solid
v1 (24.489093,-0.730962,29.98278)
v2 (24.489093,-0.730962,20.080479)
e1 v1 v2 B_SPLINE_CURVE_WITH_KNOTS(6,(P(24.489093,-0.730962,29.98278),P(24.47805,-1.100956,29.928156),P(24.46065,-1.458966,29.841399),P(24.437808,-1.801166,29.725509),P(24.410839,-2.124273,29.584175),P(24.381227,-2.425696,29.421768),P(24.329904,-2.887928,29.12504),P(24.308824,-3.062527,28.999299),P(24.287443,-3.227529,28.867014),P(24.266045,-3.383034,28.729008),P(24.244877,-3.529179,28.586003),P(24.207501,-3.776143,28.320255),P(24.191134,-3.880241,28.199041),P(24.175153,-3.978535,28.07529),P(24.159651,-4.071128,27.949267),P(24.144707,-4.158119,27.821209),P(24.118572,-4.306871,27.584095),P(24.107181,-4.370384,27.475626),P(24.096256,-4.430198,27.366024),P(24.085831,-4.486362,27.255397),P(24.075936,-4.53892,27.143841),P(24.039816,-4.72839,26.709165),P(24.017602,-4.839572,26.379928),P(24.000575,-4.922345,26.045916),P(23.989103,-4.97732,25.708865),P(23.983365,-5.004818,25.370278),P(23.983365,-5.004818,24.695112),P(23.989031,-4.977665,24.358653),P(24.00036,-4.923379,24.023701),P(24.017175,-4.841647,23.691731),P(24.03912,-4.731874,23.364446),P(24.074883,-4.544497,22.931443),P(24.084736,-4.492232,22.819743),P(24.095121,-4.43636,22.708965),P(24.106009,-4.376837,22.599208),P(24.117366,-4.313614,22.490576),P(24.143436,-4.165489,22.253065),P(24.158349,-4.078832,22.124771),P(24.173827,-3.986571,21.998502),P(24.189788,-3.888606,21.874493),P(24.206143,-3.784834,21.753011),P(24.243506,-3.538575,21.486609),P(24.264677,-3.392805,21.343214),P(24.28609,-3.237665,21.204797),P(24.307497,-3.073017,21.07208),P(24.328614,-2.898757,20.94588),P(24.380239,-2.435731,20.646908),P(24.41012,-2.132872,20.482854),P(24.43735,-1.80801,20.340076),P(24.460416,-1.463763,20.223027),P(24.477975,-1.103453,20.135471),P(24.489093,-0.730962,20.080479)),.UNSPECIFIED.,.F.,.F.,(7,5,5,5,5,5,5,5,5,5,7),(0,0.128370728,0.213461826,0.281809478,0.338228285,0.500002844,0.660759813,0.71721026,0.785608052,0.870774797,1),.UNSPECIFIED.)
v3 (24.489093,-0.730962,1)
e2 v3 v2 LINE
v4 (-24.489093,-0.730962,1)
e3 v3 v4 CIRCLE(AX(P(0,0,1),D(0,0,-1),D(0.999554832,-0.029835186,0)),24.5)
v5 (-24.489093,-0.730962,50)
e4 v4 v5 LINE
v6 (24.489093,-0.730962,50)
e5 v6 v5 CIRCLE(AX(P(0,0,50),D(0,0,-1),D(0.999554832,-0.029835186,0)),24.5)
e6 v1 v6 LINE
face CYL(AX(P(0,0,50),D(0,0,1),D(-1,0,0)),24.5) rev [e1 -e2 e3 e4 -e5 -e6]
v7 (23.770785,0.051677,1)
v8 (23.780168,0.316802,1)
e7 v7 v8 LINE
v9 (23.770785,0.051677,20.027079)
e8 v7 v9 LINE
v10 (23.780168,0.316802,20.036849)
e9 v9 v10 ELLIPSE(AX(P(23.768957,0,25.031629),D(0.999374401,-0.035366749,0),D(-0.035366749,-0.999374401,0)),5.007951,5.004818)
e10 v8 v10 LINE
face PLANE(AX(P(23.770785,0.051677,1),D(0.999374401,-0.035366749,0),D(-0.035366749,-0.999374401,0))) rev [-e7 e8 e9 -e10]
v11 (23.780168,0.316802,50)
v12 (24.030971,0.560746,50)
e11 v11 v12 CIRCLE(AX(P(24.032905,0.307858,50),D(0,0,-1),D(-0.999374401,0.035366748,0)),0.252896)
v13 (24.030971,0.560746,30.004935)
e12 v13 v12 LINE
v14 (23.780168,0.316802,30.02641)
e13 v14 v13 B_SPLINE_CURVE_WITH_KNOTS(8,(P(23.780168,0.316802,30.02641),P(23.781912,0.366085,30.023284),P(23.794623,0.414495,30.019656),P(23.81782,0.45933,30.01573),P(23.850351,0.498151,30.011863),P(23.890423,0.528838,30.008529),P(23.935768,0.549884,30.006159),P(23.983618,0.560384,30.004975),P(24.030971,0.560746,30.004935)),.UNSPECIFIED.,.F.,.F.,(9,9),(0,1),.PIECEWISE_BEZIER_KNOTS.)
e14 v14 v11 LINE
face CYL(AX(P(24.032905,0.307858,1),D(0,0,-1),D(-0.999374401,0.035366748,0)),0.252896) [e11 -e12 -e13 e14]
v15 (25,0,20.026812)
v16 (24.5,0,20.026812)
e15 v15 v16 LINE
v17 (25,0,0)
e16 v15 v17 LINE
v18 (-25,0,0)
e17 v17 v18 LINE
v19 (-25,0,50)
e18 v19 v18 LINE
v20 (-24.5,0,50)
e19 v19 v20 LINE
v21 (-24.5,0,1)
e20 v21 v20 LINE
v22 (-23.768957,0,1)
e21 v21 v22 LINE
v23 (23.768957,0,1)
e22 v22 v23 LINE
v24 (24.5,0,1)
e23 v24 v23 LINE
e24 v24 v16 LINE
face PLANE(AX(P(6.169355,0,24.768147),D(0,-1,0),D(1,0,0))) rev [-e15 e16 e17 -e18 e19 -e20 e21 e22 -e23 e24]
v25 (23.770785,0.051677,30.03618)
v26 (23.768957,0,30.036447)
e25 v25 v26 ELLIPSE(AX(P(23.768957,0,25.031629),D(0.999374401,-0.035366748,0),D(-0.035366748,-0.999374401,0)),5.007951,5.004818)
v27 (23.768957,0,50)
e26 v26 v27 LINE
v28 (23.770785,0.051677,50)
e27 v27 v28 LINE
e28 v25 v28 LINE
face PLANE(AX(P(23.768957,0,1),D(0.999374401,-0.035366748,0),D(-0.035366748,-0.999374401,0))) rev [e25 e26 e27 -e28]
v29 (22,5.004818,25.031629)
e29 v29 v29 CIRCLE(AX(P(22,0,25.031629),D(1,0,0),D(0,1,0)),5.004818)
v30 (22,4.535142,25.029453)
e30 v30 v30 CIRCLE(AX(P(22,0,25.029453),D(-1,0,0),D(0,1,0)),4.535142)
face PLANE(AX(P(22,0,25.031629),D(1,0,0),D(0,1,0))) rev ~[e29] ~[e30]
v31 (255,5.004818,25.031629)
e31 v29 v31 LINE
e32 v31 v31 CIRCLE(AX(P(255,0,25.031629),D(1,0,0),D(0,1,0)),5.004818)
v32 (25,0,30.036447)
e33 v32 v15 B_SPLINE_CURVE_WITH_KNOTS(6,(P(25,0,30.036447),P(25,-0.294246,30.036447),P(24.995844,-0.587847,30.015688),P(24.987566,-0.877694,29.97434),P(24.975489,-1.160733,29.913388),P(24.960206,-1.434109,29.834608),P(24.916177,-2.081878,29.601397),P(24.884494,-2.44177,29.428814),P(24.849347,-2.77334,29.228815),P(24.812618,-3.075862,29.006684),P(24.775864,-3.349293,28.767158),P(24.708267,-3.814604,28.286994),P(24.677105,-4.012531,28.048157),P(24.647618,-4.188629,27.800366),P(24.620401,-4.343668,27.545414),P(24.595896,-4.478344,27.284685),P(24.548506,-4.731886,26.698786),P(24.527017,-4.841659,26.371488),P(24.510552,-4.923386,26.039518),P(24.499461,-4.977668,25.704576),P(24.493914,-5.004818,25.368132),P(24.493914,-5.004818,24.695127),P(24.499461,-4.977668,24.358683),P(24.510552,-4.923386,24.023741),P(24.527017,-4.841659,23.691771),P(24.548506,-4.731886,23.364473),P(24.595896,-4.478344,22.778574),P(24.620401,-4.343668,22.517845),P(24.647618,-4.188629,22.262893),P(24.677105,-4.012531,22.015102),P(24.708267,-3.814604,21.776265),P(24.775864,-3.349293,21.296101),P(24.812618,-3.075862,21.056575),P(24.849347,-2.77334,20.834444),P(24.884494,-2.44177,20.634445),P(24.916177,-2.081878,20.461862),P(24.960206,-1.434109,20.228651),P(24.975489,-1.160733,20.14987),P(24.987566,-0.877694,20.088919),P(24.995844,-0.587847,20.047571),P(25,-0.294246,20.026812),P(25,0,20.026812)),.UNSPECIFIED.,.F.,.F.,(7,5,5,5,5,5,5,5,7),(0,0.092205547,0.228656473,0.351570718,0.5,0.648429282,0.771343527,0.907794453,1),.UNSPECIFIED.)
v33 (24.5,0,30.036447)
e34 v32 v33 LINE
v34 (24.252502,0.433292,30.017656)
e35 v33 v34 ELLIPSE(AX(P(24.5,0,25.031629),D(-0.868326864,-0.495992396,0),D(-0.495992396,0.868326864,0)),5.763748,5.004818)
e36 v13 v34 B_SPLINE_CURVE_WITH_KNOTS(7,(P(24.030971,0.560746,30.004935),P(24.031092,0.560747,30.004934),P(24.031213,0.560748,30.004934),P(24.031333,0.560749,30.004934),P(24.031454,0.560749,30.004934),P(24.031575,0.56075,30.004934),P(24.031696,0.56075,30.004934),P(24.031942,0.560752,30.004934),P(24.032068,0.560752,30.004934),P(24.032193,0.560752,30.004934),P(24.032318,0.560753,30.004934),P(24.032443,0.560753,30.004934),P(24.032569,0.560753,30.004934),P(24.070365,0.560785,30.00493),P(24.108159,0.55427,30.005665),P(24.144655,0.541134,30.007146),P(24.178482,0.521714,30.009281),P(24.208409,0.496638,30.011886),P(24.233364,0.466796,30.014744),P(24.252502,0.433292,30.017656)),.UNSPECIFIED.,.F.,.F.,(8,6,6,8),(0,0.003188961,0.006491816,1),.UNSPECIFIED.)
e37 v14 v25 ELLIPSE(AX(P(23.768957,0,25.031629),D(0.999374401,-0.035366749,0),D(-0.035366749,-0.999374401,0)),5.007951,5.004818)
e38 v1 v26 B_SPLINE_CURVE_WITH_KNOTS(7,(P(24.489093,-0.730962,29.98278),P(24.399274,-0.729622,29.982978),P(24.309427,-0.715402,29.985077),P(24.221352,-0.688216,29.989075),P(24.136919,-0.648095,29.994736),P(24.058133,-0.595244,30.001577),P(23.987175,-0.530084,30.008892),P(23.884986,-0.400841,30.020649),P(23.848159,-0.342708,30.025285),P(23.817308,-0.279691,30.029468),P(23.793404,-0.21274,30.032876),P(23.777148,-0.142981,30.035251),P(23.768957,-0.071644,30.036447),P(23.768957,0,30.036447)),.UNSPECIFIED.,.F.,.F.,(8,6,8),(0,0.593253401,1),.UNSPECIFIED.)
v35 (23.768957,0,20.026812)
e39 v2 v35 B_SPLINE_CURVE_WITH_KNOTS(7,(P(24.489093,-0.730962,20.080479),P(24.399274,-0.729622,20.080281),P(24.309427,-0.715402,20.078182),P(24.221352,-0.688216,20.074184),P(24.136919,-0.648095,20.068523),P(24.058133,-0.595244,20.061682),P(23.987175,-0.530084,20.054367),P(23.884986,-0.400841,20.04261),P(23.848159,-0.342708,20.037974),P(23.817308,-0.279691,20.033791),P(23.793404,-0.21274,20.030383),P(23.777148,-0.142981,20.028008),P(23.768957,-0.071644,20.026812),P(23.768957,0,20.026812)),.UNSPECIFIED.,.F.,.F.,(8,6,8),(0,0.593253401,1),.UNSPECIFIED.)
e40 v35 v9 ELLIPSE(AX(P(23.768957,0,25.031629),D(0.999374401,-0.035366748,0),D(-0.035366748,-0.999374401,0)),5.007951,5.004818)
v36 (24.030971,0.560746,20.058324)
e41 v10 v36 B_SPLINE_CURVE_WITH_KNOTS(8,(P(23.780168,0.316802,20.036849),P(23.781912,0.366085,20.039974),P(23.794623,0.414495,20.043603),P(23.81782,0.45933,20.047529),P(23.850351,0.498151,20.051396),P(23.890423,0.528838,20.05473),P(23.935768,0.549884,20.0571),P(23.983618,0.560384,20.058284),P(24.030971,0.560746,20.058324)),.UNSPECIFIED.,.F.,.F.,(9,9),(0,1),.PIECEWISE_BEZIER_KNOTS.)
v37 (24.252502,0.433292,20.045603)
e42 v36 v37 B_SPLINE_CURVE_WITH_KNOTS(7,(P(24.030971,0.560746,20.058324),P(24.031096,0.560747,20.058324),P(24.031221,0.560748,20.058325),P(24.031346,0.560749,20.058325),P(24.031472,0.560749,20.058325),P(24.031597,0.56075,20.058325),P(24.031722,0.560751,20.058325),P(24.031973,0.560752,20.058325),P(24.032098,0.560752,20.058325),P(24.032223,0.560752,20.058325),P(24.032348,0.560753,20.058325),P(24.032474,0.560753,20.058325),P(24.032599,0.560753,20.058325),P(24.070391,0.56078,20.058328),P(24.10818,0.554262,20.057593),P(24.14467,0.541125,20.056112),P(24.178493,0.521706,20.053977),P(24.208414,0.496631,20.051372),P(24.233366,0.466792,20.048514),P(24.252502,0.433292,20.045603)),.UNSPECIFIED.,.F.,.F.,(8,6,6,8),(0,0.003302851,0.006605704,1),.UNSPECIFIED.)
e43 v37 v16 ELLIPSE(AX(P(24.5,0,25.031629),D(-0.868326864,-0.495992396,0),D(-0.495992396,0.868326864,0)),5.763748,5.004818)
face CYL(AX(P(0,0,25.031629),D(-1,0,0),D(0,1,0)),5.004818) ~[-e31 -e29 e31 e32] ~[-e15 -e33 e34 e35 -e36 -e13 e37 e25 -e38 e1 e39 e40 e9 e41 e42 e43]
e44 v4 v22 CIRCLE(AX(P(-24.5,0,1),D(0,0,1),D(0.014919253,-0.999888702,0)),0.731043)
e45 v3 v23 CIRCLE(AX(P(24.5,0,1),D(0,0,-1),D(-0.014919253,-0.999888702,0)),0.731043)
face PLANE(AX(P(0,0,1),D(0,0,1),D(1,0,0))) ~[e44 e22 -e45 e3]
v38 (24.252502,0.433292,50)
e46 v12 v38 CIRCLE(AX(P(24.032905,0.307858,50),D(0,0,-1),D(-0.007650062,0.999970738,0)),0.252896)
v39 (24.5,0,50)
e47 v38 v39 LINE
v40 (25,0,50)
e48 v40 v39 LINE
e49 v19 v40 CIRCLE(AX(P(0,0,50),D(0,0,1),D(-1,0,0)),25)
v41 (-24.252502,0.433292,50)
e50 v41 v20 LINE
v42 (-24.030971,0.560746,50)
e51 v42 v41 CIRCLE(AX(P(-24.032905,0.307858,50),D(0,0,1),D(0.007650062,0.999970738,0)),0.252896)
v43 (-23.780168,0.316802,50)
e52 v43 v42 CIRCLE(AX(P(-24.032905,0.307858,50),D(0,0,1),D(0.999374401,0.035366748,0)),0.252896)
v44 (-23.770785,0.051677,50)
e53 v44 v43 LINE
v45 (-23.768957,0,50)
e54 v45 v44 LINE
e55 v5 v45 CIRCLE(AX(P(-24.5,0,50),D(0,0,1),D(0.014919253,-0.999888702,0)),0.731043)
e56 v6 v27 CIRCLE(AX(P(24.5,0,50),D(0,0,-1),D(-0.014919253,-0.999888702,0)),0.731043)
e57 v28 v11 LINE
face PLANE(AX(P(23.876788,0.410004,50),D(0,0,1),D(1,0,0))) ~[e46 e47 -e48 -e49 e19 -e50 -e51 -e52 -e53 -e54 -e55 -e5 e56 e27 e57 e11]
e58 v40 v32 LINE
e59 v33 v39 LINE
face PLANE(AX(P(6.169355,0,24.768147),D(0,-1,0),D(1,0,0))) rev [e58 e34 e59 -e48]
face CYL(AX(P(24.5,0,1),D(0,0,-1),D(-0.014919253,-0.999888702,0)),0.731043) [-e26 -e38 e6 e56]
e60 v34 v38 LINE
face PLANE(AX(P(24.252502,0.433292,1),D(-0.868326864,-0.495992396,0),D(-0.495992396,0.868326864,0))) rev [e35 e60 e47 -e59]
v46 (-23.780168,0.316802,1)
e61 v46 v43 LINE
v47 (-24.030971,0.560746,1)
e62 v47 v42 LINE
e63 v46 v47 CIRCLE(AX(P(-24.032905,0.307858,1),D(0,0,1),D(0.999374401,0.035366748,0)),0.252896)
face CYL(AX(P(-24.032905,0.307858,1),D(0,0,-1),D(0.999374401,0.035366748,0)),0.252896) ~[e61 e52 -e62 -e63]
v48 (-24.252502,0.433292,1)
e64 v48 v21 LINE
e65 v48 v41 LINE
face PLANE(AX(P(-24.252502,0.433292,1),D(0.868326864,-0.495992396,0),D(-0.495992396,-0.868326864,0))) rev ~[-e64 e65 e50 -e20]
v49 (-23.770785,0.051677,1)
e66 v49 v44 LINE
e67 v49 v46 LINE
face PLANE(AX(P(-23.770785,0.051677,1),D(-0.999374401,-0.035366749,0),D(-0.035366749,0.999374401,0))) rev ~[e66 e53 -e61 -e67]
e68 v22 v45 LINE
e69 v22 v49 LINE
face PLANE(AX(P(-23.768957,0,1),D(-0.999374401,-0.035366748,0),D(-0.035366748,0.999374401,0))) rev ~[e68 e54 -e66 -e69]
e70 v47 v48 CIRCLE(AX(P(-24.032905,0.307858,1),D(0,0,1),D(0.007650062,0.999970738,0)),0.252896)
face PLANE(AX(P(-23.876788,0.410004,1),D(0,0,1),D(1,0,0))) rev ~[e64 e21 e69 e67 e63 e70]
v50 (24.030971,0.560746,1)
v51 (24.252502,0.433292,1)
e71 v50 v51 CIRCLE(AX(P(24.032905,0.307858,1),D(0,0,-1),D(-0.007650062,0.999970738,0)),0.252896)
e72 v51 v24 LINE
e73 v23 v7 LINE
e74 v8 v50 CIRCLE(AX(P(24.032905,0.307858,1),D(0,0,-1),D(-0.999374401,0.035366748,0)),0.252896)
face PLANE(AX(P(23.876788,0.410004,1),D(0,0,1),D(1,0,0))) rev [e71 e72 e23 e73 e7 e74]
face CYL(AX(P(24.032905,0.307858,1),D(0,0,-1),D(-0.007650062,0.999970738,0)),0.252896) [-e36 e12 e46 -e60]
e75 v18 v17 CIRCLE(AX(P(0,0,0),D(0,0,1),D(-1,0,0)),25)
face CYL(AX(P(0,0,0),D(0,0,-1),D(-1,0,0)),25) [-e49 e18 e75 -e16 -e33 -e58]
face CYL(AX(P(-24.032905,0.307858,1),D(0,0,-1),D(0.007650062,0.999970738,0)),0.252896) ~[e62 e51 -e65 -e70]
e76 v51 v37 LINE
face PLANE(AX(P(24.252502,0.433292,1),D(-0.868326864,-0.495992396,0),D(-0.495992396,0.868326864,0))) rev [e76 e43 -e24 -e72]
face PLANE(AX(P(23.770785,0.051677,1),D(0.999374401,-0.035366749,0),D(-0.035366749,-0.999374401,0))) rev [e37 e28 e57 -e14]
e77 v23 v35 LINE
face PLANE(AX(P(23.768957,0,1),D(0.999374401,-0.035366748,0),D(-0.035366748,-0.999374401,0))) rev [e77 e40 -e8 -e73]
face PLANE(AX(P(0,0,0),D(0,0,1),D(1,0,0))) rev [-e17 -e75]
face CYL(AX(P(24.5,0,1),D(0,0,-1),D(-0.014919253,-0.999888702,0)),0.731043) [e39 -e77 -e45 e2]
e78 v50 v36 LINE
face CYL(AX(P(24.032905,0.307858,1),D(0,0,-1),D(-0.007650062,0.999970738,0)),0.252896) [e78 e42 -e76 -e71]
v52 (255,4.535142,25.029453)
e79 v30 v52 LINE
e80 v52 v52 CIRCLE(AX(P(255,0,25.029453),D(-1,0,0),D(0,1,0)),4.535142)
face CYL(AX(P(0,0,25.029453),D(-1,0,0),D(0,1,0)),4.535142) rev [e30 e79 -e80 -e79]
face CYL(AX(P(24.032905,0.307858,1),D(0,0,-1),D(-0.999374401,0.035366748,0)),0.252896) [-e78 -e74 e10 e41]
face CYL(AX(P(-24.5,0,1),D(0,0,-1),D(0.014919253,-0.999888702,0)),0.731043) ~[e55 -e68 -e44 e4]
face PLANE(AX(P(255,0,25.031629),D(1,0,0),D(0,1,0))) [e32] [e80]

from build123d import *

# Parameters (mm, degrees)
F0_R      = 25
F1_DEPTH  = 50
F2_R      = 24.5
F3_DEPTH  = 49
F4_W      = 133.0040432513
F4_H      = 80.2016193047
F5_DEPTH  = 25
F7_DEPTH  = 49
F8_W      = 90.9072607756
F8_H      = 76.9354877993
F9_DEPTH  = 25
F11_R     = 5.0048176475
F11_R_2   = 4.4964097491
F12_DEPTH = 255
F13_DEPTH = 22
F14_R     = 4.5351415883
F15_DEPTH = 500


with BuildPart() as f1:
    # F0 (on Top) → F1 (new body)
    with BuildSketch(Plane.XY):
        Circle(F0_R)
    extrude(amount=F1_DEPTH)

    # F2 (on face) → F3 (cut)
    with BuildSketch(Plane.XY.offset(50)):
        Circle(F2_R)
    extrude(amount=-F3_DEPTH, mode=Mode.SUBTRACT)

    # F4 (on Front) → F5 (cut)
    with BuildSketch(Plane.XZ):
        with Locations((-6.1693545431, 24.7681471519)):
            Rectangle(F4_W, F4_H)
    extrude(amount=-F5_DEPTH, mode=Mode.SUBTRACT)

    # F6 (on face) → F7 (join)
    with BuildSketch(Plane.XY.offset(1)):
        with BuildLine():
            ThreePointArc((-23.7997439297, 0.2099188306), (-23.7849922899, 0.2579040005), (-23.7800096296, 0.307857584))
            ThreePointArc((-23.7800096296, 0.307857584), (-23.7800491855, 0.3123303341), (-23.780167841, 0.3168016851))
            ThreePointArc((-23.780167841, 0.3168016851), (-23.8565770485, 0.4891434991), (-24.0309707308, 0.5607459532))
            ThreePointArc((-24.0309707308, 0.5607459532), (-23.8896091672, 0.4023027599), (-23.7997439297, 0.2099188306))
        make_face()
        with BuildLine():
            ThreePointArc((-23.780167841, 0.3168016851), (-23.7800491855, 0.3123303341), (-23.7800096296, 0.307857584))
            ThreePointArc((-23.7800096296, 0.307857584), (-23.7849922899, 0.2579040005), (-23.7997439297, 0.2099188306))
            ThreePointArc((-23.7997439297, 0.2099188306), (-23.780898653, 0.1315968548), (-23.77078537, 0.0516769082))
            Line((-23.77078537, 0.0516769082), (-23.780167841, 0.3168016851))
        make_face()
        with BuildLine():
            ThreePointArc((-23.77078537, 0.0516769082), (-23.780898653, 0.1315968548), (-23.7997439297, 0.2099188306))
            ThreePointArc((-23.7997439297, 0.2099188306), (-24.1447977278, 0.0810616911), (-24.2525015897, 0.4332919626))
            Line((-24.2525015897, 0.4332919626), (-24.5, 0))
            Line((-24.5, 0), (-23.7689565817, 0))
            Line((-23.7689565817, 0), (-23.77078537, 0.0516769082))
        make_face()
        with BuildLine():
            ThreePointArc((-24.2525015897, 0.4332919626), (-24.1447977278, 0.0810616911), (-23.7997439297, 0.2099188306))
            ThreePointArc((-23.7997439297, 0.2099188306), (-23.8896091672, 0.4023027599), (-24.0309707308, 0.5607459532))
            ThreePointArc((-24.0309707308, 0.5607459532), (-24.1590214746, 0.5270629802), (-24.2525015897, 0.4332919626))
        make_face()
        with BuildLine():
            ThreePointArc((-24.5, 0), (-24.4972731927, -0.3655217092), (-24.489093378, -0.7309620544))
            ThreePointArc((-24.489093378, -0.7309620544), (-23.9792324445, -0.5130551945), (-23.7689565817, 0))
            Line((-23.7689565817, 0), (-24.5, 0))
        make_face()
    extrude(amount=F7_DEPTH)

    # F8 (on Right) → F9 (cut)
    with BuildSketch(Plane.YZ):
        with Locations((-10.7056461275, 28.0342758633)):
            Rectangle(F8_W, F8_H)
    extrude(amount=F9_DEPTH, mode=Mode.SUBTRACT)

    # F10: F1 across face


with BuildPart() as f1_1:
    add(f1.part)
    add(f1.part.mirror(Plane(origin=(0, -18.5631313131, 12.8737373737), x_dir=(0, 1, 0), z_dir=(1, 0, 0))))

    # F11 (on Right) → F12 (join)
    with BuildSketch(Plane.YZ):
        with Locations((0, 25.0316294775)):
            Circle(F11_R)
        with Locations((0, 25.0316294775)):
            Circle(F11_R_2, mode=Mode.SUBTRACT)
    extrude(amount=F12_DEPTH)

    # F11 (on Right) → F13 (cut)
    with BuildSketch(Plane.YZ):
        with Locations((0, 25.0316294775)):
            Circle(F11_R)
        with Locations((0, 25.0316294775)):
            Circle(F11_R_2, mode=Mode.SUBTRACT)
    extrude(amount=F13_DEPTH, mode=Mode.SUBTRACT)

    # F14 (on Right) → F15 (cut)
    with BuildSketch(Plane.YZ):
        with Locations((0, 25.0294525176)):
            Circle(F14_R)
    extrude(amount=F15_DEPTH, mode=Mode.SUBTRACT)


solid = f1_1.part
